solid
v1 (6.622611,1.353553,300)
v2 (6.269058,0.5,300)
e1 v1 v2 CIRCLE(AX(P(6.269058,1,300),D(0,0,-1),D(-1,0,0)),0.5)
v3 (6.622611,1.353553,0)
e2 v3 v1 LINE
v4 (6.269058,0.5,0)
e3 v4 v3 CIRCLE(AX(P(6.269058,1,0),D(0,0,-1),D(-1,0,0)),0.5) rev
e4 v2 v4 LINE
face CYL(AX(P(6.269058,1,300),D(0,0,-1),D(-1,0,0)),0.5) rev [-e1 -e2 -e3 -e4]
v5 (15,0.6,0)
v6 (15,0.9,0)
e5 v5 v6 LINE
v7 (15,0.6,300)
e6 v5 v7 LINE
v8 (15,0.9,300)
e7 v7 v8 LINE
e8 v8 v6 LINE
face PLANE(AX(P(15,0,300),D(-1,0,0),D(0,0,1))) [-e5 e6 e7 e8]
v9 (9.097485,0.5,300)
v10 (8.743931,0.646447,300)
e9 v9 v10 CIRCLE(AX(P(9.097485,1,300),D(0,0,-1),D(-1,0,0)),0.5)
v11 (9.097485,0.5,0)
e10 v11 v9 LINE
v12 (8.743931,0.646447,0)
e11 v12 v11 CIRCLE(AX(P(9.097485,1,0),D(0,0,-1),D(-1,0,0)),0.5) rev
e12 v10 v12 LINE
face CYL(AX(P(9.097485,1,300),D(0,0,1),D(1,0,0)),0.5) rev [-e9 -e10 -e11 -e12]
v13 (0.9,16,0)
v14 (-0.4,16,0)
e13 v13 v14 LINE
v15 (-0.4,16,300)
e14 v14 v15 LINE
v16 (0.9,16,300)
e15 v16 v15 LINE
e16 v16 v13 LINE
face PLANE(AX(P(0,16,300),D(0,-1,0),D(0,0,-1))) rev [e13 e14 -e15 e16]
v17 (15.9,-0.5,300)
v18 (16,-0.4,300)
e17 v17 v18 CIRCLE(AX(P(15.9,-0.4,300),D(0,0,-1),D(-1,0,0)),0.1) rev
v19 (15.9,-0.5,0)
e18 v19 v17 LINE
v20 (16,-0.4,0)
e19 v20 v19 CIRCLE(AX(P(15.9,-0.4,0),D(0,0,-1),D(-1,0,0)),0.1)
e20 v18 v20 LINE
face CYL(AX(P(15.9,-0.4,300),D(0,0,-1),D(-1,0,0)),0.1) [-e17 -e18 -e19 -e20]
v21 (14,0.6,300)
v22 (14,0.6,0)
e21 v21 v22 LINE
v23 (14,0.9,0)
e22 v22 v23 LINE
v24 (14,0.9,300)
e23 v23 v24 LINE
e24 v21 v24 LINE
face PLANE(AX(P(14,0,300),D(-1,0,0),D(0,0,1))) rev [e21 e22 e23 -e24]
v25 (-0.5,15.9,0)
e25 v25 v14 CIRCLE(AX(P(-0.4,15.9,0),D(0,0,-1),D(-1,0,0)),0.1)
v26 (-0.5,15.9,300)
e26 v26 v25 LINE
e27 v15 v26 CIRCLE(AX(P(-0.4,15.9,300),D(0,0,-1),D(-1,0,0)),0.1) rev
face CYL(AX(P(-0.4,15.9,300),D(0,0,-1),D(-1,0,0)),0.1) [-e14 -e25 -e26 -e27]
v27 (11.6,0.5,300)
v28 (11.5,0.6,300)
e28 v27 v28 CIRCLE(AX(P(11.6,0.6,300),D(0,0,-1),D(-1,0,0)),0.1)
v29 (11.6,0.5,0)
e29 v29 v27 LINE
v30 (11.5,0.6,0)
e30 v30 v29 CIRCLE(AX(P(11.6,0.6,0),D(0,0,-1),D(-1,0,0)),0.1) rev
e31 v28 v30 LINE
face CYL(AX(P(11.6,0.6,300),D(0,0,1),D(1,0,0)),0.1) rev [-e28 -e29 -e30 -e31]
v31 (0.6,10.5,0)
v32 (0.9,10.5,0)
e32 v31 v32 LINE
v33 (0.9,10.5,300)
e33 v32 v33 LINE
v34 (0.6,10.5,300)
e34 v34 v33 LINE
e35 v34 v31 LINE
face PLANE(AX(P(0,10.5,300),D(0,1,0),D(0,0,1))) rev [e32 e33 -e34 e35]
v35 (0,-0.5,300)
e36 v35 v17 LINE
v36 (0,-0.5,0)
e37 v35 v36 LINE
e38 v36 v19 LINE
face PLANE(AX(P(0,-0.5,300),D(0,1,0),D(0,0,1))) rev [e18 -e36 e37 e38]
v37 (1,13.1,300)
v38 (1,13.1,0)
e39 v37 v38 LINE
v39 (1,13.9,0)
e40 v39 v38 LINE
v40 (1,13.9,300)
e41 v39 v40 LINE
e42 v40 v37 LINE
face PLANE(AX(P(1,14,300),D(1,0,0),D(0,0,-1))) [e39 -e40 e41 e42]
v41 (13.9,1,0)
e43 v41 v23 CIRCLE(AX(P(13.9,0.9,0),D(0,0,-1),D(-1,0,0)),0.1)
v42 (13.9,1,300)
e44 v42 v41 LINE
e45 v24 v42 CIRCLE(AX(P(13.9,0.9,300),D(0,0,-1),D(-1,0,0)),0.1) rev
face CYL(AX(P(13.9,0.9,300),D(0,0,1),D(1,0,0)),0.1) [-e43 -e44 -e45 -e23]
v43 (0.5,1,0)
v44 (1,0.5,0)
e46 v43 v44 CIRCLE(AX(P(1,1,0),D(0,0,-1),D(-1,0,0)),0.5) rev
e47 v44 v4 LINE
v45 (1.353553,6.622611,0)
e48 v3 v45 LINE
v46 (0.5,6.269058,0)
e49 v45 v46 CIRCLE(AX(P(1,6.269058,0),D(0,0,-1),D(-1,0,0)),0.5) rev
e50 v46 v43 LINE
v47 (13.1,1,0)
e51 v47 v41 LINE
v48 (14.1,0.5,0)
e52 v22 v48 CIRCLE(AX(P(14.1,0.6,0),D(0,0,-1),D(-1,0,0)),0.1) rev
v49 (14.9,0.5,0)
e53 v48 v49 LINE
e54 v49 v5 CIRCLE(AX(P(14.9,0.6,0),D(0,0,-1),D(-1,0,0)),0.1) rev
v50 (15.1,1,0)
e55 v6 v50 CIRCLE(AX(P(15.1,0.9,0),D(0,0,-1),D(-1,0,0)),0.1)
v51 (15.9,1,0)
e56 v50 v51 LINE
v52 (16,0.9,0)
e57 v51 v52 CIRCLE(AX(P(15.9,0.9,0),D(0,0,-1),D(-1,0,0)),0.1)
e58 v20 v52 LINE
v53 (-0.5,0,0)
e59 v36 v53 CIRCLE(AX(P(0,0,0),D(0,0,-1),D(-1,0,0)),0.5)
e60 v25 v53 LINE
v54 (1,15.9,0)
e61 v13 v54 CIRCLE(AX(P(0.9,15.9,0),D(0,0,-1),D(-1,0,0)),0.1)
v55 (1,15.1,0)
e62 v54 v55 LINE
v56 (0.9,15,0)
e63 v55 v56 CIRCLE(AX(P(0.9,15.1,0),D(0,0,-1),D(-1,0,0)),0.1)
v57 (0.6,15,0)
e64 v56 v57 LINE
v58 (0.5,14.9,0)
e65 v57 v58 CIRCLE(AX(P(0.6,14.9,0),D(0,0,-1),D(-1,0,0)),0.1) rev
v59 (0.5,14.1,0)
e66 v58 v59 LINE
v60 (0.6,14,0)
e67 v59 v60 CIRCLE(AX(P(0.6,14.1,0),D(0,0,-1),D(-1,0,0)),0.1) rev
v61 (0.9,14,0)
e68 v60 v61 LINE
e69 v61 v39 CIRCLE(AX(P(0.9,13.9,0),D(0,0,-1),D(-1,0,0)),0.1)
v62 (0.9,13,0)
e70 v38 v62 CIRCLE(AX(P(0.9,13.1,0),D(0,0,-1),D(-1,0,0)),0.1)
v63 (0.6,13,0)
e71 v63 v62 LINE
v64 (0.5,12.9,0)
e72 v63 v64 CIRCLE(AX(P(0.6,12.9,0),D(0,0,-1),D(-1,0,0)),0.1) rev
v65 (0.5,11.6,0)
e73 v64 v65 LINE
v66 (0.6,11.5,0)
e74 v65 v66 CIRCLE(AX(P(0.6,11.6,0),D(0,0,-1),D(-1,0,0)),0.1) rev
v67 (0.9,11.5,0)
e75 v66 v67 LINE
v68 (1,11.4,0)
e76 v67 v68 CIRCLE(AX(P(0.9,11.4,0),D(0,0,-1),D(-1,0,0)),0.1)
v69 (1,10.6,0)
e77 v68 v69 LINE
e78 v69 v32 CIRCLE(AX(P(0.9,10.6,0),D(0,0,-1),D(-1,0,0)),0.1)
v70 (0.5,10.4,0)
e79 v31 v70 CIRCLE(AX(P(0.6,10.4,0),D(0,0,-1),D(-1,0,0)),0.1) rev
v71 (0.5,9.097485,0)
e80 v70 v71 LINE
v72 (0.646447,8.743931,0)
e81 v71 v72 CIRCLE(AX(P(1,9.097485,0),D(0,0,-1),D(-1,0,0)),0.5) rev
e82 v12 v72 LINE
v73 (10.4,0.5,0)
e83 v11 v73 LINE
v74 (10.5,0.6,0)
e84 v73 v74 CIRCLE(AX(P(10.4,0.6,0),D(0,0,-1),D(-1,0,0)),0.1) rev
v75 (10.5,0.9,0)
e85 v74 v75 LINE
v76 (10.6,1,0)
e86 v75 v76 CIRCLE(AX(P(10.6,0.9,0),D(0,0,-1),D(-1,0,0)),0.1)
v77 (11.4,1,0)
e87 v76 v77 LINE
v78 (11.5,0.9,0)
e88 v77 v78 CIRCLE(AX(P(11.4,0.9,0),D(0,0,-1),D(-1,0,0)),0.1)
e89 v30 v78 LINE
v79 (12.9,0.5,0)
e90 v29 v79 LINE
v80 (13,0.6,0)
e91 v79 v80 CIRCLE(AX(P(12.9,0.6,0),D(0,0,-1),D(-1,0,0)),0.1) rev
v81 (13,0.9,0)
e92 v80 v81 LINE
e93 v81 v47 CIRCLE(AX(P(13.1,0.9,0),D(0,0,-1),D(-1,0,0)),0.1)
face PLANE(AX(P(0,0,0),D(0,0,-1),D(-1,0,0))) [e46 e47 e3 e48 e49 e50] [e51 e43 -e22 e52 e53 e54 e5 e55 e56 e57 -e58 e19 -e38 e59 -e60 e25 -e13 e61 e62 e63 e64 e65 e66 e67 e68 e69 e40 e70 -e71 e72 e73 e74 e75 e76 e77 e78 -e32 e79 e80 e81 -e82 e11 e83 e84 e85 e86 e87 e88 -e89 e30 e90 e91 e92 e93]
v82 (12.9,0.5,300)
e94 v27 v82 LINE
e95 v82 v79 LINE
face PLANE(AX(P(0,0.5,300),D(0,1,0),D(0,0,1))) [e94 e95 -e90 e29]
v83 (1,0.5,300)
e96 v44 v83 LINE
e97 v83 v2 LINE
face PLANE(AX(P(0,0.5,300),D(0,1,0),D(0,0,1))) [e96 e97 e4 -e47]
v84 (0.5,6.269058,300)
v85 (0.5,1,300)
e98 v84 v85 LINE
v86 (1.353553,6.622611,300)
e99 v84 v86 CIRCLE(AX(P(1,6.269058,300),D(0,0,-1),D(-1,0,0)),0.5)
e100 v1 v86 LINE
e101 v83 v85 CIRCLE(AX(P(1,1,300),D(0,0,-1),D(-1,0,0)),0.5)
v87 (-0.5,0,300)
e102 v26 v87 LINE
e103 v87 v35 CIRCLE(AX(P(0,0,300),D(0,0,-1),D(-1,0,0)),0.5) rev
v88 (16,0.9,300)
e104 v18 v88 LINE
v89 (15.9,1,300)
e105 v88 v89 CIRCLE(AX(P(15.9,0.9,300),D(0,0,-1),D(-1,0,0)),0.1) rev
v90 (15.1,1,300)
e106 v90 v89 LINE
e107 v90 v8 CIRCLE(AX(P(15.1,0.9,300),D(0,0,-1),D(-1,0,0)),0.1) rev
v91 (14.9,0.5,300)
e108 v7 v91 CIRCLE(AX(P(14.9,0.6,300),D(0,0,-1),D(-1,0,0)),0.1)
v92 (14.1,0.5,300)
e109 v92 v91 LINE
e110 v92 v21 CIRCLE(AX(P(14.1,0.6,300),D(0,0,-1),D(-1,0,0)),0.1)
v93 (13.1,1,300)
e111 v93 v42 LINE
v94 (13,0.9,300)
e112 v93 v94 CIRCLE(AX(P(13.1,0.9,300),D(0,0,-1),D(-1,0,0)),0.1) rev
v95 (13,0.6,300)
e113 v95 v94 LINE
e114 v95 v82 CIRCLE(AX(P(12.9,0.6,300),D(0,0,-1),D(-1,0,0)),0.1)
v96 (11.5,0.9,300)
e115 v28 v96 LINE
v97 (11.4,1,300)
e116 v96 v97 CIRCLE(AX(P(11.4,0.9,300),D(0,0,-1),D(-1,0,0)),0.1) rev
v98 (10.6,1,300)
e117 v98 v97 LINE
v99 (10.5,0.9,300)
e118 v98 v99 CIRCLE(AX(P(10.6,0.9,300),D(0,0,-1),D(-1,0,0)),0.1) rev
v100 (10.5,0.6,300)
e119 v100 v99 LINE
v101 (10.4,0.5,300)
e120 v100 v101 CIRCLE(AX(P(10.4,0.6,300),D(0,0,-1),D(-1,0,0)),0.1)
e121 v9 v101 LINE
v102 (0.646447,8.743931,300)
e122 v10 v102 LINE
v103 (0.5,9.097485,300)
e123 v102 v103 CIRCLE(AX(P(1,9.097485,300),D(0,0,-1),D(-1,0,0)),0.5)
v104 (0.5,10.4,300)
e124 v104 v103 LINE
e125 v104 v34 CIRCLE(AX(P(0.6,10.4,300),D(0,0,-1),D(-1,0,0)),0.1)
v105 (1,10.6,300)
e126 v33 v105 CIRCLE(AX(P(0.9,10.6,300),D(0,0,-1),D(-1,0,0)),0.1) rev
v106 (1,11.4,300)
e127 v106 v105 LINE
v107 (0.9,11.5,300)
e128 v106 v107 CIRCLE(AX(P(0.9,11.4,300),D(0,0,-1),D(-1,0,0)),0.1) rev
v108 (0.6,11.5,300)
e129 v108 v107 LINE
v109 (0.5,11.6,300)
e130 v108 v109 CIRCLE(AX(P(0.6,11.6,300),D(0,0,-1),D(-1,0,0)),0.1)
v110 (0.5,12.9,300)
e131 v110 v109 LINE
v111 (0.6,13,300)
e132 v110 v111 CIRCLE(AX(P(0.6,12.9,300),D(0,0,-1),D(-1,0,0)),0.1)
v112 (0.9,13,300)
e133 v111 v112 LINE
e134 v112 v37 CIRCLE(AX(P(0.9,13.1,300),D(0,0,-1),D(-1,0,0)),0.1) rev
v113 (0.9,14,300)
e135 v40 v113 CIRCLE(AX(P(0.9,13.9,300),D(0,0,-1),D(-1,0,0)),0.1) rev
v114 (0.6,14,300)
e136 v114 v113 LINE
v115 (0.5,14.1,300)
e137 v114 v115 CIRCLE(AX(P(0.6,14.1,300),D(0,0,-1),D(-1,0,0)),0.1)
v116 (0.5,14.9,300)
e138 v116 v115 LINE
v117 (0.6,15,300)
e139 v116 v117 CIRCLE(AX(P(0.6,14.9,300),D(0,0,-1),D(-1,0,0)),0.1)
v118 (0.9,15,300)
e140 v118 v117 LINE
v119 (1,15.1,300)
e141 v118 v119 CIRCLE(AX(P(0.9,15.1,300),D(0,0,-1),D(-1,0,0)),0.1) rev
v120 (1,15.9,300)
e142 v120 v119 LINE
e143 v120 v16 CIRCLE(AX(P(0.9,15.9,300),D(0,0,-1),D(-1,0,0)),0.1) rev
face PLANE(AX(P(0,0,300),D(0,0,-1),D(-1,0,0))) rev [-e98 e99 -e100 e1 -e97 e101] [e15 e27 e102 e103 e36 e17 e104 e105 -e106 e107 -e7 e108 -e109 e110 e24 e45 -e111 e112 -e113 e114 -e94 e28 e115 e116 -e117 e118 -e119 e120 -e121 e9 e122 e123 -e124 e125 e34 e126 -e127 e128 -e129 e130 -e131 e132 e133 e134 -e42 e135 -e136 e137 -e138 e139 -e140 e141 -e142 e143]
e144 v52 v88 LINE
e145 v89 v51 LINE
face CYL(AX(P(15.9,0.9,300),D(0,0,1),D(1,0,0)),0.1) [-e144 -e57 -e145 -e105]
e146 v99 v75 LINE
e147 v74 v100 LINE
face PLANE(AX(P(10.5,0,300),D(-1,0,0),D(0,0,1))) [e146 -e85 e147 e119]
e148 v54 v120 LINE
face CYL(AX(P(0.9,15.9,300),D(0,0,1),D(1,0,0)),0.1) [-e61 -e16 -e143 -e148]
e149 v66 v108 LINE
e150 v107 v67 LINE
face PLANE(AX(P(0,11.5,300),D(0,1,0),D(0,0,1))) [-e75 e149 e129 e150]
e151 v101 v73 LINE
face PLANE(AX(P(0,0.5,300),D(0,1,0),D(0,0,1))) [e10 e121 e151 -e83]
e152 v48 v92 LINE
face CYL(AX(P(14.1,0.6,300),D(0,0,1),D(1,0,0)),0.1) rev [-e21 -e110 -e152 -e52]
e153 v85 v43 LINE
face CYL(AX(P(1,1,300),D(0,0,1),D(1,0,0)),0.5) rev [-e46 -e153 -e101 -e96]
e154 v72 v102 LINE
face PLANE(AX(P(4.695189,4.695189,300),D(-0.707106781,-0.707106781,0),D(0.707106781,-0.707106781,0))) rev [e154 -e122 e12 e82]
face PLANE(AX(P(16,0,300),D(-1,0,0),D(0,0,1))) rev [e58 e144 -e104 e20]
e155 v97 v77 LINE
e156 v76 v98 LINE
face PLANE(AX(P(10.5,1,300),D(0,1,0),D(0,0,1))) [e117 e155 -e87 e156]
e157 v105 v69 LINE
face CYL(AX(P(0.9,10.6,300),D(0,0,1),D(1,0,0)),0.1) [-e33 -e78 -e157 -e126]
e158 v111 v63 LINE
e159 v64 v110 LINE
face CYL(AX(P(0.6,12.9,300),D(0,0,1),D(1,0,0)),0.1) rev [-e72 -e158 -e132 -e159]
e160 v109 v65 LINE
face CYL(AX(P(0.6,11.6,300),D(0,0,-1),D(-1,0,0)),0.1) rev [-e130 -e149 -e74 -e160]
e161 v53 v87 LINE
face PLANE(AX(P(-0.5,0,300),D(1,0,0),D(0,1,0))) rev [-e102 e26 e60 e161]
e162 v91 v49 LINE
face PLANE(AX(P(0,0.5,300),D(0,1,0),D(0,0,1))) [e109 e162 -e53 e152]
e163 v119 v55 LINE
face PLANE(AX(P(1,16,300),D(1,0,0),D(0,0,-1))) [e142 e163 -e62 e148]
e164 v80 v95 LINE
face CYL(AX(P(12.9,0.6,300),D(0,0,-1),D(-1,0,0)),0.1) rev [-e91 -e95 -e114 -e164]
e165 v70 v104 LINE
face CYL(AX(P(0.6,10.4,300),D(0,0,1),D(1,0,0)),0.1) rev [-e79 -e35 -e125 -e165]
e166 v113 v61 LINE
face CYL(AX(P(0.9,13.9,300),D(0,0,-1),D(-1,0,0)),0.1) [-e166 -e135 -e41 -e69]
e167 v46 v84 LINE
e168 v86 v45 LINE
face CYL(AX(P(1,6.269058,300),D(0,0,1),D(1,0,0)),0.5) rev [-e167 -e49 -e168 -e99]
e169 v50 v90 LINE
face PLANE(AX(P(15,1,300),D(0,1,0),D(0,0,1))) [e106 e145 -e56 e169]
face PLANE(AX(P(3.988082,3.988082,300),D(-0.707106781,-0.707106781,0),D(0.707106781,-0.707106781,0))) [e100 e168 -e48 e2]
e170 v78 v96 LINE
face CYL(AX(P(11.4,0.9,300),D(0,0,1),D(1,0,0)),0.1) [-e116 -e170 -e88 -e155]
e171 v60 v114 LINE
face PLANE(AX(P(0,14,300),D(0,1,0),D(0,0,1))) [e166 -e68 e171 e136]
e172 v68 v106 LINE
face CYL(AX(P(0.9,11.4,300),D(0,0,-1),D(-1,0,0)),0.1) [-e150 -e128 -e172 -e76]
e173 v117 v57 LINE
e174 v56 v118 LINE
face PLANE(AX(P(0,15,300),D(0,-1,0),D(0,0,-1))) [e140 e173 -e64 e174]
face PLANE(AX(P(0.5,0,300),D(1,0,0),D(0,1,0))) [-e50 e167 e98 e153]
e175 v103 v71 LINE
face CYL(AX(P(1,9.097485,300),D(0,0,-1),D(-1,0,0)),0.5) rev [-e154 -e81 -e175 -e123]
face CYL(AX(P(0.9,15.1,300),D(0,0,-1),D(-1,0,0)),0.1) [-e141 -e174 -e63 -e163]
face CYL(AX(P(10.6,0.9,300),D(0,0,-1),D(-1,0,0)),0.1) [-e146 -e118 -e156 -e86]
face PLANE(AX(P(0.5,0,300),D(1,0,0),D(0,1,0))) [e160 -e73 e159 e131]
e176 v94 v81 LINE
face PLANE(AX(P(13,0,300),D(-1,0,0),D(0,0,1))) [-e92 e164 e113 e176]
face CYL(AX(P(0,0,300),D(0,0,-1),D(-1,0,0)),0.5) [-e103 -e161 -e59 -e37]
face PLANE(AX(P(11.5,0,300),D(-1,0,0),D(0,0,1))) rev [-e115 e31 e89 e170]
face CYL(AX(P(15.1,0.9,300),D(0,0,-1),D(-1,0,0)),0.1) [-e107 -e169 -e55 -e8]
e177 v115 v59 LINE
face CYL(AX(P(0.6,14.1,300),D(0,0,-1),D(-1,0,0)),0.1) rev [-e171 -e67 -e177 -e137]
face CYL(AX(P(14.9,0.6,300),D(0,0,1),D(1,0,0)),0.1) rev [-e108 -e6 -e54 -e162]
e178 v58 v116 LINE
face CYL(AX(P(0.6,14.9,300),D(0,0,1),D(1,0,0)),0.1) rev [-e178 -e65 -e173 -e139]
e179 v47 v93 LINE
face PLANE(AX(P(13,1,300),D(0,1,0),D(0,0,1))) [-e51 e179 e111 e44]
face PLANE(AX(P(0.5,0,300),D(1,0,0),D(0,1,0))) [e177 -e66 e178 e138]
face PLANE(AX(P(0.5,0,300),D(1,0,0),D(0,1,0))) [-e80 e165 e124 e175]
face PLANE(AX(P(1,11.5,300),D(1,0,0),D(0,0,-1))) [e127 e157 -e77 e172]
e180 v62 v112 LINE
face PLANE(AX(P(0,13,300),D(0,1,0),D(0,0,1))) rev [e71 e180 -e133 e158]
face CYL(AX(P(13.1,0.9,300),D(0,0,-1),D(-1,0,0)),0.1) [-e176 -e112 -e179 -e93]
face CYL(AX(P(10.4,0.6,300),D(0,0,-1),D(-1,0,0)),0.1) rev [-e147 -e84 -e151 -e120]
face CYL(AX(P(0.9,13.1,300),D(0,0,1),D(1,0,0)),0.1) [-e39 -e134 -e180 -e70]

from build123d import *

# Parameters (mm, degrees)
EXTRUDE_THIN4_DEPTH = 300
FILLET2_R           = 0.5
FILLET4_R           = 0.1


# Read off the part's stored shape, not the designer's step: Extrude-Thin4
with BuildPart() as part:
    # Extrude-Thin4 outline → Extrude-Thin4 (new body)
    with BuildSketch(Plane.XY):
        Polygon((-0.5, 16), (-0.5, -0.5), (16, -0.5), (16, 1), (15, 1), (15, 0.5), (14, 0.5), (14, 1), (13, 1), (13, 0.5), (11.5, 0.5), (11.5, 1), (10.5, 1), (10.5, 0.5), (8.890378054, 0.5), (0.5, 8.890378054), (0.5, 10.5), (1, 10.5), (1, 11.5), (0.5, 11.5), (0.5, 13), (1, 13), (1, 14), (0.5, 14), (0.5, 15), (1, 15), (1, 16), align=None)
        Polygon((7.476164492, 0.5), (0.5, 0.5), (0.5, 7.476164492), align=None, mode=Mode.SUBTRACT)
    extrude(amount=EXTRUDE_THIN4_DEPTH)

    # Fillet2
    fillet2_edges = [part.edges().sort_by_distance(p)[0] for p in [
        (-0.5, -0.5, 150),
        (0.5, 0.5, 150),
        (0.5, 7.476164492, 150),
        (0.5, 8.890378054, 150),
        (7.476164492, 0.5, 150),
        (8.890378054, 0.5, 150),
    ]]
    fillet(fillet2_edges, radius=FILLET2_R)

    # Fillet4
    fillet4_edges = [part.edges().sort_by_distance(p)[0] for p in [
        (16, -0.5, 150),
        (-0.5, 16, 150),
        (1, 16, 150),
        (1, 15, 150),
        (0.5, 15, 150),
        (15, 0.5, 150),
        (15, 1, 150),
        (16, 1, 150),
        (0.5, 11.5, 150),
        (0.5, 10.5, 150),
        (0.5, 14, 150),
        (0.5, 13, 150),
        (13, 0.5, 150),
        (14, 0.5, 150),
        (10.5, 0.5, 150),
        (11.5, 0.5, 150),
        (11.5, 1, 150),
        (10.5, 1, 150),
        (14, 1, 150),
        (13, 1, 150),
        (1, 13, 150),
        (1, 14, 150),
        (1, 10.5, 150),
        (1, 11.5, 150),
    ]]
    fillet(fillet4_edges, radius=FILLET4_R)


solid = part.part
